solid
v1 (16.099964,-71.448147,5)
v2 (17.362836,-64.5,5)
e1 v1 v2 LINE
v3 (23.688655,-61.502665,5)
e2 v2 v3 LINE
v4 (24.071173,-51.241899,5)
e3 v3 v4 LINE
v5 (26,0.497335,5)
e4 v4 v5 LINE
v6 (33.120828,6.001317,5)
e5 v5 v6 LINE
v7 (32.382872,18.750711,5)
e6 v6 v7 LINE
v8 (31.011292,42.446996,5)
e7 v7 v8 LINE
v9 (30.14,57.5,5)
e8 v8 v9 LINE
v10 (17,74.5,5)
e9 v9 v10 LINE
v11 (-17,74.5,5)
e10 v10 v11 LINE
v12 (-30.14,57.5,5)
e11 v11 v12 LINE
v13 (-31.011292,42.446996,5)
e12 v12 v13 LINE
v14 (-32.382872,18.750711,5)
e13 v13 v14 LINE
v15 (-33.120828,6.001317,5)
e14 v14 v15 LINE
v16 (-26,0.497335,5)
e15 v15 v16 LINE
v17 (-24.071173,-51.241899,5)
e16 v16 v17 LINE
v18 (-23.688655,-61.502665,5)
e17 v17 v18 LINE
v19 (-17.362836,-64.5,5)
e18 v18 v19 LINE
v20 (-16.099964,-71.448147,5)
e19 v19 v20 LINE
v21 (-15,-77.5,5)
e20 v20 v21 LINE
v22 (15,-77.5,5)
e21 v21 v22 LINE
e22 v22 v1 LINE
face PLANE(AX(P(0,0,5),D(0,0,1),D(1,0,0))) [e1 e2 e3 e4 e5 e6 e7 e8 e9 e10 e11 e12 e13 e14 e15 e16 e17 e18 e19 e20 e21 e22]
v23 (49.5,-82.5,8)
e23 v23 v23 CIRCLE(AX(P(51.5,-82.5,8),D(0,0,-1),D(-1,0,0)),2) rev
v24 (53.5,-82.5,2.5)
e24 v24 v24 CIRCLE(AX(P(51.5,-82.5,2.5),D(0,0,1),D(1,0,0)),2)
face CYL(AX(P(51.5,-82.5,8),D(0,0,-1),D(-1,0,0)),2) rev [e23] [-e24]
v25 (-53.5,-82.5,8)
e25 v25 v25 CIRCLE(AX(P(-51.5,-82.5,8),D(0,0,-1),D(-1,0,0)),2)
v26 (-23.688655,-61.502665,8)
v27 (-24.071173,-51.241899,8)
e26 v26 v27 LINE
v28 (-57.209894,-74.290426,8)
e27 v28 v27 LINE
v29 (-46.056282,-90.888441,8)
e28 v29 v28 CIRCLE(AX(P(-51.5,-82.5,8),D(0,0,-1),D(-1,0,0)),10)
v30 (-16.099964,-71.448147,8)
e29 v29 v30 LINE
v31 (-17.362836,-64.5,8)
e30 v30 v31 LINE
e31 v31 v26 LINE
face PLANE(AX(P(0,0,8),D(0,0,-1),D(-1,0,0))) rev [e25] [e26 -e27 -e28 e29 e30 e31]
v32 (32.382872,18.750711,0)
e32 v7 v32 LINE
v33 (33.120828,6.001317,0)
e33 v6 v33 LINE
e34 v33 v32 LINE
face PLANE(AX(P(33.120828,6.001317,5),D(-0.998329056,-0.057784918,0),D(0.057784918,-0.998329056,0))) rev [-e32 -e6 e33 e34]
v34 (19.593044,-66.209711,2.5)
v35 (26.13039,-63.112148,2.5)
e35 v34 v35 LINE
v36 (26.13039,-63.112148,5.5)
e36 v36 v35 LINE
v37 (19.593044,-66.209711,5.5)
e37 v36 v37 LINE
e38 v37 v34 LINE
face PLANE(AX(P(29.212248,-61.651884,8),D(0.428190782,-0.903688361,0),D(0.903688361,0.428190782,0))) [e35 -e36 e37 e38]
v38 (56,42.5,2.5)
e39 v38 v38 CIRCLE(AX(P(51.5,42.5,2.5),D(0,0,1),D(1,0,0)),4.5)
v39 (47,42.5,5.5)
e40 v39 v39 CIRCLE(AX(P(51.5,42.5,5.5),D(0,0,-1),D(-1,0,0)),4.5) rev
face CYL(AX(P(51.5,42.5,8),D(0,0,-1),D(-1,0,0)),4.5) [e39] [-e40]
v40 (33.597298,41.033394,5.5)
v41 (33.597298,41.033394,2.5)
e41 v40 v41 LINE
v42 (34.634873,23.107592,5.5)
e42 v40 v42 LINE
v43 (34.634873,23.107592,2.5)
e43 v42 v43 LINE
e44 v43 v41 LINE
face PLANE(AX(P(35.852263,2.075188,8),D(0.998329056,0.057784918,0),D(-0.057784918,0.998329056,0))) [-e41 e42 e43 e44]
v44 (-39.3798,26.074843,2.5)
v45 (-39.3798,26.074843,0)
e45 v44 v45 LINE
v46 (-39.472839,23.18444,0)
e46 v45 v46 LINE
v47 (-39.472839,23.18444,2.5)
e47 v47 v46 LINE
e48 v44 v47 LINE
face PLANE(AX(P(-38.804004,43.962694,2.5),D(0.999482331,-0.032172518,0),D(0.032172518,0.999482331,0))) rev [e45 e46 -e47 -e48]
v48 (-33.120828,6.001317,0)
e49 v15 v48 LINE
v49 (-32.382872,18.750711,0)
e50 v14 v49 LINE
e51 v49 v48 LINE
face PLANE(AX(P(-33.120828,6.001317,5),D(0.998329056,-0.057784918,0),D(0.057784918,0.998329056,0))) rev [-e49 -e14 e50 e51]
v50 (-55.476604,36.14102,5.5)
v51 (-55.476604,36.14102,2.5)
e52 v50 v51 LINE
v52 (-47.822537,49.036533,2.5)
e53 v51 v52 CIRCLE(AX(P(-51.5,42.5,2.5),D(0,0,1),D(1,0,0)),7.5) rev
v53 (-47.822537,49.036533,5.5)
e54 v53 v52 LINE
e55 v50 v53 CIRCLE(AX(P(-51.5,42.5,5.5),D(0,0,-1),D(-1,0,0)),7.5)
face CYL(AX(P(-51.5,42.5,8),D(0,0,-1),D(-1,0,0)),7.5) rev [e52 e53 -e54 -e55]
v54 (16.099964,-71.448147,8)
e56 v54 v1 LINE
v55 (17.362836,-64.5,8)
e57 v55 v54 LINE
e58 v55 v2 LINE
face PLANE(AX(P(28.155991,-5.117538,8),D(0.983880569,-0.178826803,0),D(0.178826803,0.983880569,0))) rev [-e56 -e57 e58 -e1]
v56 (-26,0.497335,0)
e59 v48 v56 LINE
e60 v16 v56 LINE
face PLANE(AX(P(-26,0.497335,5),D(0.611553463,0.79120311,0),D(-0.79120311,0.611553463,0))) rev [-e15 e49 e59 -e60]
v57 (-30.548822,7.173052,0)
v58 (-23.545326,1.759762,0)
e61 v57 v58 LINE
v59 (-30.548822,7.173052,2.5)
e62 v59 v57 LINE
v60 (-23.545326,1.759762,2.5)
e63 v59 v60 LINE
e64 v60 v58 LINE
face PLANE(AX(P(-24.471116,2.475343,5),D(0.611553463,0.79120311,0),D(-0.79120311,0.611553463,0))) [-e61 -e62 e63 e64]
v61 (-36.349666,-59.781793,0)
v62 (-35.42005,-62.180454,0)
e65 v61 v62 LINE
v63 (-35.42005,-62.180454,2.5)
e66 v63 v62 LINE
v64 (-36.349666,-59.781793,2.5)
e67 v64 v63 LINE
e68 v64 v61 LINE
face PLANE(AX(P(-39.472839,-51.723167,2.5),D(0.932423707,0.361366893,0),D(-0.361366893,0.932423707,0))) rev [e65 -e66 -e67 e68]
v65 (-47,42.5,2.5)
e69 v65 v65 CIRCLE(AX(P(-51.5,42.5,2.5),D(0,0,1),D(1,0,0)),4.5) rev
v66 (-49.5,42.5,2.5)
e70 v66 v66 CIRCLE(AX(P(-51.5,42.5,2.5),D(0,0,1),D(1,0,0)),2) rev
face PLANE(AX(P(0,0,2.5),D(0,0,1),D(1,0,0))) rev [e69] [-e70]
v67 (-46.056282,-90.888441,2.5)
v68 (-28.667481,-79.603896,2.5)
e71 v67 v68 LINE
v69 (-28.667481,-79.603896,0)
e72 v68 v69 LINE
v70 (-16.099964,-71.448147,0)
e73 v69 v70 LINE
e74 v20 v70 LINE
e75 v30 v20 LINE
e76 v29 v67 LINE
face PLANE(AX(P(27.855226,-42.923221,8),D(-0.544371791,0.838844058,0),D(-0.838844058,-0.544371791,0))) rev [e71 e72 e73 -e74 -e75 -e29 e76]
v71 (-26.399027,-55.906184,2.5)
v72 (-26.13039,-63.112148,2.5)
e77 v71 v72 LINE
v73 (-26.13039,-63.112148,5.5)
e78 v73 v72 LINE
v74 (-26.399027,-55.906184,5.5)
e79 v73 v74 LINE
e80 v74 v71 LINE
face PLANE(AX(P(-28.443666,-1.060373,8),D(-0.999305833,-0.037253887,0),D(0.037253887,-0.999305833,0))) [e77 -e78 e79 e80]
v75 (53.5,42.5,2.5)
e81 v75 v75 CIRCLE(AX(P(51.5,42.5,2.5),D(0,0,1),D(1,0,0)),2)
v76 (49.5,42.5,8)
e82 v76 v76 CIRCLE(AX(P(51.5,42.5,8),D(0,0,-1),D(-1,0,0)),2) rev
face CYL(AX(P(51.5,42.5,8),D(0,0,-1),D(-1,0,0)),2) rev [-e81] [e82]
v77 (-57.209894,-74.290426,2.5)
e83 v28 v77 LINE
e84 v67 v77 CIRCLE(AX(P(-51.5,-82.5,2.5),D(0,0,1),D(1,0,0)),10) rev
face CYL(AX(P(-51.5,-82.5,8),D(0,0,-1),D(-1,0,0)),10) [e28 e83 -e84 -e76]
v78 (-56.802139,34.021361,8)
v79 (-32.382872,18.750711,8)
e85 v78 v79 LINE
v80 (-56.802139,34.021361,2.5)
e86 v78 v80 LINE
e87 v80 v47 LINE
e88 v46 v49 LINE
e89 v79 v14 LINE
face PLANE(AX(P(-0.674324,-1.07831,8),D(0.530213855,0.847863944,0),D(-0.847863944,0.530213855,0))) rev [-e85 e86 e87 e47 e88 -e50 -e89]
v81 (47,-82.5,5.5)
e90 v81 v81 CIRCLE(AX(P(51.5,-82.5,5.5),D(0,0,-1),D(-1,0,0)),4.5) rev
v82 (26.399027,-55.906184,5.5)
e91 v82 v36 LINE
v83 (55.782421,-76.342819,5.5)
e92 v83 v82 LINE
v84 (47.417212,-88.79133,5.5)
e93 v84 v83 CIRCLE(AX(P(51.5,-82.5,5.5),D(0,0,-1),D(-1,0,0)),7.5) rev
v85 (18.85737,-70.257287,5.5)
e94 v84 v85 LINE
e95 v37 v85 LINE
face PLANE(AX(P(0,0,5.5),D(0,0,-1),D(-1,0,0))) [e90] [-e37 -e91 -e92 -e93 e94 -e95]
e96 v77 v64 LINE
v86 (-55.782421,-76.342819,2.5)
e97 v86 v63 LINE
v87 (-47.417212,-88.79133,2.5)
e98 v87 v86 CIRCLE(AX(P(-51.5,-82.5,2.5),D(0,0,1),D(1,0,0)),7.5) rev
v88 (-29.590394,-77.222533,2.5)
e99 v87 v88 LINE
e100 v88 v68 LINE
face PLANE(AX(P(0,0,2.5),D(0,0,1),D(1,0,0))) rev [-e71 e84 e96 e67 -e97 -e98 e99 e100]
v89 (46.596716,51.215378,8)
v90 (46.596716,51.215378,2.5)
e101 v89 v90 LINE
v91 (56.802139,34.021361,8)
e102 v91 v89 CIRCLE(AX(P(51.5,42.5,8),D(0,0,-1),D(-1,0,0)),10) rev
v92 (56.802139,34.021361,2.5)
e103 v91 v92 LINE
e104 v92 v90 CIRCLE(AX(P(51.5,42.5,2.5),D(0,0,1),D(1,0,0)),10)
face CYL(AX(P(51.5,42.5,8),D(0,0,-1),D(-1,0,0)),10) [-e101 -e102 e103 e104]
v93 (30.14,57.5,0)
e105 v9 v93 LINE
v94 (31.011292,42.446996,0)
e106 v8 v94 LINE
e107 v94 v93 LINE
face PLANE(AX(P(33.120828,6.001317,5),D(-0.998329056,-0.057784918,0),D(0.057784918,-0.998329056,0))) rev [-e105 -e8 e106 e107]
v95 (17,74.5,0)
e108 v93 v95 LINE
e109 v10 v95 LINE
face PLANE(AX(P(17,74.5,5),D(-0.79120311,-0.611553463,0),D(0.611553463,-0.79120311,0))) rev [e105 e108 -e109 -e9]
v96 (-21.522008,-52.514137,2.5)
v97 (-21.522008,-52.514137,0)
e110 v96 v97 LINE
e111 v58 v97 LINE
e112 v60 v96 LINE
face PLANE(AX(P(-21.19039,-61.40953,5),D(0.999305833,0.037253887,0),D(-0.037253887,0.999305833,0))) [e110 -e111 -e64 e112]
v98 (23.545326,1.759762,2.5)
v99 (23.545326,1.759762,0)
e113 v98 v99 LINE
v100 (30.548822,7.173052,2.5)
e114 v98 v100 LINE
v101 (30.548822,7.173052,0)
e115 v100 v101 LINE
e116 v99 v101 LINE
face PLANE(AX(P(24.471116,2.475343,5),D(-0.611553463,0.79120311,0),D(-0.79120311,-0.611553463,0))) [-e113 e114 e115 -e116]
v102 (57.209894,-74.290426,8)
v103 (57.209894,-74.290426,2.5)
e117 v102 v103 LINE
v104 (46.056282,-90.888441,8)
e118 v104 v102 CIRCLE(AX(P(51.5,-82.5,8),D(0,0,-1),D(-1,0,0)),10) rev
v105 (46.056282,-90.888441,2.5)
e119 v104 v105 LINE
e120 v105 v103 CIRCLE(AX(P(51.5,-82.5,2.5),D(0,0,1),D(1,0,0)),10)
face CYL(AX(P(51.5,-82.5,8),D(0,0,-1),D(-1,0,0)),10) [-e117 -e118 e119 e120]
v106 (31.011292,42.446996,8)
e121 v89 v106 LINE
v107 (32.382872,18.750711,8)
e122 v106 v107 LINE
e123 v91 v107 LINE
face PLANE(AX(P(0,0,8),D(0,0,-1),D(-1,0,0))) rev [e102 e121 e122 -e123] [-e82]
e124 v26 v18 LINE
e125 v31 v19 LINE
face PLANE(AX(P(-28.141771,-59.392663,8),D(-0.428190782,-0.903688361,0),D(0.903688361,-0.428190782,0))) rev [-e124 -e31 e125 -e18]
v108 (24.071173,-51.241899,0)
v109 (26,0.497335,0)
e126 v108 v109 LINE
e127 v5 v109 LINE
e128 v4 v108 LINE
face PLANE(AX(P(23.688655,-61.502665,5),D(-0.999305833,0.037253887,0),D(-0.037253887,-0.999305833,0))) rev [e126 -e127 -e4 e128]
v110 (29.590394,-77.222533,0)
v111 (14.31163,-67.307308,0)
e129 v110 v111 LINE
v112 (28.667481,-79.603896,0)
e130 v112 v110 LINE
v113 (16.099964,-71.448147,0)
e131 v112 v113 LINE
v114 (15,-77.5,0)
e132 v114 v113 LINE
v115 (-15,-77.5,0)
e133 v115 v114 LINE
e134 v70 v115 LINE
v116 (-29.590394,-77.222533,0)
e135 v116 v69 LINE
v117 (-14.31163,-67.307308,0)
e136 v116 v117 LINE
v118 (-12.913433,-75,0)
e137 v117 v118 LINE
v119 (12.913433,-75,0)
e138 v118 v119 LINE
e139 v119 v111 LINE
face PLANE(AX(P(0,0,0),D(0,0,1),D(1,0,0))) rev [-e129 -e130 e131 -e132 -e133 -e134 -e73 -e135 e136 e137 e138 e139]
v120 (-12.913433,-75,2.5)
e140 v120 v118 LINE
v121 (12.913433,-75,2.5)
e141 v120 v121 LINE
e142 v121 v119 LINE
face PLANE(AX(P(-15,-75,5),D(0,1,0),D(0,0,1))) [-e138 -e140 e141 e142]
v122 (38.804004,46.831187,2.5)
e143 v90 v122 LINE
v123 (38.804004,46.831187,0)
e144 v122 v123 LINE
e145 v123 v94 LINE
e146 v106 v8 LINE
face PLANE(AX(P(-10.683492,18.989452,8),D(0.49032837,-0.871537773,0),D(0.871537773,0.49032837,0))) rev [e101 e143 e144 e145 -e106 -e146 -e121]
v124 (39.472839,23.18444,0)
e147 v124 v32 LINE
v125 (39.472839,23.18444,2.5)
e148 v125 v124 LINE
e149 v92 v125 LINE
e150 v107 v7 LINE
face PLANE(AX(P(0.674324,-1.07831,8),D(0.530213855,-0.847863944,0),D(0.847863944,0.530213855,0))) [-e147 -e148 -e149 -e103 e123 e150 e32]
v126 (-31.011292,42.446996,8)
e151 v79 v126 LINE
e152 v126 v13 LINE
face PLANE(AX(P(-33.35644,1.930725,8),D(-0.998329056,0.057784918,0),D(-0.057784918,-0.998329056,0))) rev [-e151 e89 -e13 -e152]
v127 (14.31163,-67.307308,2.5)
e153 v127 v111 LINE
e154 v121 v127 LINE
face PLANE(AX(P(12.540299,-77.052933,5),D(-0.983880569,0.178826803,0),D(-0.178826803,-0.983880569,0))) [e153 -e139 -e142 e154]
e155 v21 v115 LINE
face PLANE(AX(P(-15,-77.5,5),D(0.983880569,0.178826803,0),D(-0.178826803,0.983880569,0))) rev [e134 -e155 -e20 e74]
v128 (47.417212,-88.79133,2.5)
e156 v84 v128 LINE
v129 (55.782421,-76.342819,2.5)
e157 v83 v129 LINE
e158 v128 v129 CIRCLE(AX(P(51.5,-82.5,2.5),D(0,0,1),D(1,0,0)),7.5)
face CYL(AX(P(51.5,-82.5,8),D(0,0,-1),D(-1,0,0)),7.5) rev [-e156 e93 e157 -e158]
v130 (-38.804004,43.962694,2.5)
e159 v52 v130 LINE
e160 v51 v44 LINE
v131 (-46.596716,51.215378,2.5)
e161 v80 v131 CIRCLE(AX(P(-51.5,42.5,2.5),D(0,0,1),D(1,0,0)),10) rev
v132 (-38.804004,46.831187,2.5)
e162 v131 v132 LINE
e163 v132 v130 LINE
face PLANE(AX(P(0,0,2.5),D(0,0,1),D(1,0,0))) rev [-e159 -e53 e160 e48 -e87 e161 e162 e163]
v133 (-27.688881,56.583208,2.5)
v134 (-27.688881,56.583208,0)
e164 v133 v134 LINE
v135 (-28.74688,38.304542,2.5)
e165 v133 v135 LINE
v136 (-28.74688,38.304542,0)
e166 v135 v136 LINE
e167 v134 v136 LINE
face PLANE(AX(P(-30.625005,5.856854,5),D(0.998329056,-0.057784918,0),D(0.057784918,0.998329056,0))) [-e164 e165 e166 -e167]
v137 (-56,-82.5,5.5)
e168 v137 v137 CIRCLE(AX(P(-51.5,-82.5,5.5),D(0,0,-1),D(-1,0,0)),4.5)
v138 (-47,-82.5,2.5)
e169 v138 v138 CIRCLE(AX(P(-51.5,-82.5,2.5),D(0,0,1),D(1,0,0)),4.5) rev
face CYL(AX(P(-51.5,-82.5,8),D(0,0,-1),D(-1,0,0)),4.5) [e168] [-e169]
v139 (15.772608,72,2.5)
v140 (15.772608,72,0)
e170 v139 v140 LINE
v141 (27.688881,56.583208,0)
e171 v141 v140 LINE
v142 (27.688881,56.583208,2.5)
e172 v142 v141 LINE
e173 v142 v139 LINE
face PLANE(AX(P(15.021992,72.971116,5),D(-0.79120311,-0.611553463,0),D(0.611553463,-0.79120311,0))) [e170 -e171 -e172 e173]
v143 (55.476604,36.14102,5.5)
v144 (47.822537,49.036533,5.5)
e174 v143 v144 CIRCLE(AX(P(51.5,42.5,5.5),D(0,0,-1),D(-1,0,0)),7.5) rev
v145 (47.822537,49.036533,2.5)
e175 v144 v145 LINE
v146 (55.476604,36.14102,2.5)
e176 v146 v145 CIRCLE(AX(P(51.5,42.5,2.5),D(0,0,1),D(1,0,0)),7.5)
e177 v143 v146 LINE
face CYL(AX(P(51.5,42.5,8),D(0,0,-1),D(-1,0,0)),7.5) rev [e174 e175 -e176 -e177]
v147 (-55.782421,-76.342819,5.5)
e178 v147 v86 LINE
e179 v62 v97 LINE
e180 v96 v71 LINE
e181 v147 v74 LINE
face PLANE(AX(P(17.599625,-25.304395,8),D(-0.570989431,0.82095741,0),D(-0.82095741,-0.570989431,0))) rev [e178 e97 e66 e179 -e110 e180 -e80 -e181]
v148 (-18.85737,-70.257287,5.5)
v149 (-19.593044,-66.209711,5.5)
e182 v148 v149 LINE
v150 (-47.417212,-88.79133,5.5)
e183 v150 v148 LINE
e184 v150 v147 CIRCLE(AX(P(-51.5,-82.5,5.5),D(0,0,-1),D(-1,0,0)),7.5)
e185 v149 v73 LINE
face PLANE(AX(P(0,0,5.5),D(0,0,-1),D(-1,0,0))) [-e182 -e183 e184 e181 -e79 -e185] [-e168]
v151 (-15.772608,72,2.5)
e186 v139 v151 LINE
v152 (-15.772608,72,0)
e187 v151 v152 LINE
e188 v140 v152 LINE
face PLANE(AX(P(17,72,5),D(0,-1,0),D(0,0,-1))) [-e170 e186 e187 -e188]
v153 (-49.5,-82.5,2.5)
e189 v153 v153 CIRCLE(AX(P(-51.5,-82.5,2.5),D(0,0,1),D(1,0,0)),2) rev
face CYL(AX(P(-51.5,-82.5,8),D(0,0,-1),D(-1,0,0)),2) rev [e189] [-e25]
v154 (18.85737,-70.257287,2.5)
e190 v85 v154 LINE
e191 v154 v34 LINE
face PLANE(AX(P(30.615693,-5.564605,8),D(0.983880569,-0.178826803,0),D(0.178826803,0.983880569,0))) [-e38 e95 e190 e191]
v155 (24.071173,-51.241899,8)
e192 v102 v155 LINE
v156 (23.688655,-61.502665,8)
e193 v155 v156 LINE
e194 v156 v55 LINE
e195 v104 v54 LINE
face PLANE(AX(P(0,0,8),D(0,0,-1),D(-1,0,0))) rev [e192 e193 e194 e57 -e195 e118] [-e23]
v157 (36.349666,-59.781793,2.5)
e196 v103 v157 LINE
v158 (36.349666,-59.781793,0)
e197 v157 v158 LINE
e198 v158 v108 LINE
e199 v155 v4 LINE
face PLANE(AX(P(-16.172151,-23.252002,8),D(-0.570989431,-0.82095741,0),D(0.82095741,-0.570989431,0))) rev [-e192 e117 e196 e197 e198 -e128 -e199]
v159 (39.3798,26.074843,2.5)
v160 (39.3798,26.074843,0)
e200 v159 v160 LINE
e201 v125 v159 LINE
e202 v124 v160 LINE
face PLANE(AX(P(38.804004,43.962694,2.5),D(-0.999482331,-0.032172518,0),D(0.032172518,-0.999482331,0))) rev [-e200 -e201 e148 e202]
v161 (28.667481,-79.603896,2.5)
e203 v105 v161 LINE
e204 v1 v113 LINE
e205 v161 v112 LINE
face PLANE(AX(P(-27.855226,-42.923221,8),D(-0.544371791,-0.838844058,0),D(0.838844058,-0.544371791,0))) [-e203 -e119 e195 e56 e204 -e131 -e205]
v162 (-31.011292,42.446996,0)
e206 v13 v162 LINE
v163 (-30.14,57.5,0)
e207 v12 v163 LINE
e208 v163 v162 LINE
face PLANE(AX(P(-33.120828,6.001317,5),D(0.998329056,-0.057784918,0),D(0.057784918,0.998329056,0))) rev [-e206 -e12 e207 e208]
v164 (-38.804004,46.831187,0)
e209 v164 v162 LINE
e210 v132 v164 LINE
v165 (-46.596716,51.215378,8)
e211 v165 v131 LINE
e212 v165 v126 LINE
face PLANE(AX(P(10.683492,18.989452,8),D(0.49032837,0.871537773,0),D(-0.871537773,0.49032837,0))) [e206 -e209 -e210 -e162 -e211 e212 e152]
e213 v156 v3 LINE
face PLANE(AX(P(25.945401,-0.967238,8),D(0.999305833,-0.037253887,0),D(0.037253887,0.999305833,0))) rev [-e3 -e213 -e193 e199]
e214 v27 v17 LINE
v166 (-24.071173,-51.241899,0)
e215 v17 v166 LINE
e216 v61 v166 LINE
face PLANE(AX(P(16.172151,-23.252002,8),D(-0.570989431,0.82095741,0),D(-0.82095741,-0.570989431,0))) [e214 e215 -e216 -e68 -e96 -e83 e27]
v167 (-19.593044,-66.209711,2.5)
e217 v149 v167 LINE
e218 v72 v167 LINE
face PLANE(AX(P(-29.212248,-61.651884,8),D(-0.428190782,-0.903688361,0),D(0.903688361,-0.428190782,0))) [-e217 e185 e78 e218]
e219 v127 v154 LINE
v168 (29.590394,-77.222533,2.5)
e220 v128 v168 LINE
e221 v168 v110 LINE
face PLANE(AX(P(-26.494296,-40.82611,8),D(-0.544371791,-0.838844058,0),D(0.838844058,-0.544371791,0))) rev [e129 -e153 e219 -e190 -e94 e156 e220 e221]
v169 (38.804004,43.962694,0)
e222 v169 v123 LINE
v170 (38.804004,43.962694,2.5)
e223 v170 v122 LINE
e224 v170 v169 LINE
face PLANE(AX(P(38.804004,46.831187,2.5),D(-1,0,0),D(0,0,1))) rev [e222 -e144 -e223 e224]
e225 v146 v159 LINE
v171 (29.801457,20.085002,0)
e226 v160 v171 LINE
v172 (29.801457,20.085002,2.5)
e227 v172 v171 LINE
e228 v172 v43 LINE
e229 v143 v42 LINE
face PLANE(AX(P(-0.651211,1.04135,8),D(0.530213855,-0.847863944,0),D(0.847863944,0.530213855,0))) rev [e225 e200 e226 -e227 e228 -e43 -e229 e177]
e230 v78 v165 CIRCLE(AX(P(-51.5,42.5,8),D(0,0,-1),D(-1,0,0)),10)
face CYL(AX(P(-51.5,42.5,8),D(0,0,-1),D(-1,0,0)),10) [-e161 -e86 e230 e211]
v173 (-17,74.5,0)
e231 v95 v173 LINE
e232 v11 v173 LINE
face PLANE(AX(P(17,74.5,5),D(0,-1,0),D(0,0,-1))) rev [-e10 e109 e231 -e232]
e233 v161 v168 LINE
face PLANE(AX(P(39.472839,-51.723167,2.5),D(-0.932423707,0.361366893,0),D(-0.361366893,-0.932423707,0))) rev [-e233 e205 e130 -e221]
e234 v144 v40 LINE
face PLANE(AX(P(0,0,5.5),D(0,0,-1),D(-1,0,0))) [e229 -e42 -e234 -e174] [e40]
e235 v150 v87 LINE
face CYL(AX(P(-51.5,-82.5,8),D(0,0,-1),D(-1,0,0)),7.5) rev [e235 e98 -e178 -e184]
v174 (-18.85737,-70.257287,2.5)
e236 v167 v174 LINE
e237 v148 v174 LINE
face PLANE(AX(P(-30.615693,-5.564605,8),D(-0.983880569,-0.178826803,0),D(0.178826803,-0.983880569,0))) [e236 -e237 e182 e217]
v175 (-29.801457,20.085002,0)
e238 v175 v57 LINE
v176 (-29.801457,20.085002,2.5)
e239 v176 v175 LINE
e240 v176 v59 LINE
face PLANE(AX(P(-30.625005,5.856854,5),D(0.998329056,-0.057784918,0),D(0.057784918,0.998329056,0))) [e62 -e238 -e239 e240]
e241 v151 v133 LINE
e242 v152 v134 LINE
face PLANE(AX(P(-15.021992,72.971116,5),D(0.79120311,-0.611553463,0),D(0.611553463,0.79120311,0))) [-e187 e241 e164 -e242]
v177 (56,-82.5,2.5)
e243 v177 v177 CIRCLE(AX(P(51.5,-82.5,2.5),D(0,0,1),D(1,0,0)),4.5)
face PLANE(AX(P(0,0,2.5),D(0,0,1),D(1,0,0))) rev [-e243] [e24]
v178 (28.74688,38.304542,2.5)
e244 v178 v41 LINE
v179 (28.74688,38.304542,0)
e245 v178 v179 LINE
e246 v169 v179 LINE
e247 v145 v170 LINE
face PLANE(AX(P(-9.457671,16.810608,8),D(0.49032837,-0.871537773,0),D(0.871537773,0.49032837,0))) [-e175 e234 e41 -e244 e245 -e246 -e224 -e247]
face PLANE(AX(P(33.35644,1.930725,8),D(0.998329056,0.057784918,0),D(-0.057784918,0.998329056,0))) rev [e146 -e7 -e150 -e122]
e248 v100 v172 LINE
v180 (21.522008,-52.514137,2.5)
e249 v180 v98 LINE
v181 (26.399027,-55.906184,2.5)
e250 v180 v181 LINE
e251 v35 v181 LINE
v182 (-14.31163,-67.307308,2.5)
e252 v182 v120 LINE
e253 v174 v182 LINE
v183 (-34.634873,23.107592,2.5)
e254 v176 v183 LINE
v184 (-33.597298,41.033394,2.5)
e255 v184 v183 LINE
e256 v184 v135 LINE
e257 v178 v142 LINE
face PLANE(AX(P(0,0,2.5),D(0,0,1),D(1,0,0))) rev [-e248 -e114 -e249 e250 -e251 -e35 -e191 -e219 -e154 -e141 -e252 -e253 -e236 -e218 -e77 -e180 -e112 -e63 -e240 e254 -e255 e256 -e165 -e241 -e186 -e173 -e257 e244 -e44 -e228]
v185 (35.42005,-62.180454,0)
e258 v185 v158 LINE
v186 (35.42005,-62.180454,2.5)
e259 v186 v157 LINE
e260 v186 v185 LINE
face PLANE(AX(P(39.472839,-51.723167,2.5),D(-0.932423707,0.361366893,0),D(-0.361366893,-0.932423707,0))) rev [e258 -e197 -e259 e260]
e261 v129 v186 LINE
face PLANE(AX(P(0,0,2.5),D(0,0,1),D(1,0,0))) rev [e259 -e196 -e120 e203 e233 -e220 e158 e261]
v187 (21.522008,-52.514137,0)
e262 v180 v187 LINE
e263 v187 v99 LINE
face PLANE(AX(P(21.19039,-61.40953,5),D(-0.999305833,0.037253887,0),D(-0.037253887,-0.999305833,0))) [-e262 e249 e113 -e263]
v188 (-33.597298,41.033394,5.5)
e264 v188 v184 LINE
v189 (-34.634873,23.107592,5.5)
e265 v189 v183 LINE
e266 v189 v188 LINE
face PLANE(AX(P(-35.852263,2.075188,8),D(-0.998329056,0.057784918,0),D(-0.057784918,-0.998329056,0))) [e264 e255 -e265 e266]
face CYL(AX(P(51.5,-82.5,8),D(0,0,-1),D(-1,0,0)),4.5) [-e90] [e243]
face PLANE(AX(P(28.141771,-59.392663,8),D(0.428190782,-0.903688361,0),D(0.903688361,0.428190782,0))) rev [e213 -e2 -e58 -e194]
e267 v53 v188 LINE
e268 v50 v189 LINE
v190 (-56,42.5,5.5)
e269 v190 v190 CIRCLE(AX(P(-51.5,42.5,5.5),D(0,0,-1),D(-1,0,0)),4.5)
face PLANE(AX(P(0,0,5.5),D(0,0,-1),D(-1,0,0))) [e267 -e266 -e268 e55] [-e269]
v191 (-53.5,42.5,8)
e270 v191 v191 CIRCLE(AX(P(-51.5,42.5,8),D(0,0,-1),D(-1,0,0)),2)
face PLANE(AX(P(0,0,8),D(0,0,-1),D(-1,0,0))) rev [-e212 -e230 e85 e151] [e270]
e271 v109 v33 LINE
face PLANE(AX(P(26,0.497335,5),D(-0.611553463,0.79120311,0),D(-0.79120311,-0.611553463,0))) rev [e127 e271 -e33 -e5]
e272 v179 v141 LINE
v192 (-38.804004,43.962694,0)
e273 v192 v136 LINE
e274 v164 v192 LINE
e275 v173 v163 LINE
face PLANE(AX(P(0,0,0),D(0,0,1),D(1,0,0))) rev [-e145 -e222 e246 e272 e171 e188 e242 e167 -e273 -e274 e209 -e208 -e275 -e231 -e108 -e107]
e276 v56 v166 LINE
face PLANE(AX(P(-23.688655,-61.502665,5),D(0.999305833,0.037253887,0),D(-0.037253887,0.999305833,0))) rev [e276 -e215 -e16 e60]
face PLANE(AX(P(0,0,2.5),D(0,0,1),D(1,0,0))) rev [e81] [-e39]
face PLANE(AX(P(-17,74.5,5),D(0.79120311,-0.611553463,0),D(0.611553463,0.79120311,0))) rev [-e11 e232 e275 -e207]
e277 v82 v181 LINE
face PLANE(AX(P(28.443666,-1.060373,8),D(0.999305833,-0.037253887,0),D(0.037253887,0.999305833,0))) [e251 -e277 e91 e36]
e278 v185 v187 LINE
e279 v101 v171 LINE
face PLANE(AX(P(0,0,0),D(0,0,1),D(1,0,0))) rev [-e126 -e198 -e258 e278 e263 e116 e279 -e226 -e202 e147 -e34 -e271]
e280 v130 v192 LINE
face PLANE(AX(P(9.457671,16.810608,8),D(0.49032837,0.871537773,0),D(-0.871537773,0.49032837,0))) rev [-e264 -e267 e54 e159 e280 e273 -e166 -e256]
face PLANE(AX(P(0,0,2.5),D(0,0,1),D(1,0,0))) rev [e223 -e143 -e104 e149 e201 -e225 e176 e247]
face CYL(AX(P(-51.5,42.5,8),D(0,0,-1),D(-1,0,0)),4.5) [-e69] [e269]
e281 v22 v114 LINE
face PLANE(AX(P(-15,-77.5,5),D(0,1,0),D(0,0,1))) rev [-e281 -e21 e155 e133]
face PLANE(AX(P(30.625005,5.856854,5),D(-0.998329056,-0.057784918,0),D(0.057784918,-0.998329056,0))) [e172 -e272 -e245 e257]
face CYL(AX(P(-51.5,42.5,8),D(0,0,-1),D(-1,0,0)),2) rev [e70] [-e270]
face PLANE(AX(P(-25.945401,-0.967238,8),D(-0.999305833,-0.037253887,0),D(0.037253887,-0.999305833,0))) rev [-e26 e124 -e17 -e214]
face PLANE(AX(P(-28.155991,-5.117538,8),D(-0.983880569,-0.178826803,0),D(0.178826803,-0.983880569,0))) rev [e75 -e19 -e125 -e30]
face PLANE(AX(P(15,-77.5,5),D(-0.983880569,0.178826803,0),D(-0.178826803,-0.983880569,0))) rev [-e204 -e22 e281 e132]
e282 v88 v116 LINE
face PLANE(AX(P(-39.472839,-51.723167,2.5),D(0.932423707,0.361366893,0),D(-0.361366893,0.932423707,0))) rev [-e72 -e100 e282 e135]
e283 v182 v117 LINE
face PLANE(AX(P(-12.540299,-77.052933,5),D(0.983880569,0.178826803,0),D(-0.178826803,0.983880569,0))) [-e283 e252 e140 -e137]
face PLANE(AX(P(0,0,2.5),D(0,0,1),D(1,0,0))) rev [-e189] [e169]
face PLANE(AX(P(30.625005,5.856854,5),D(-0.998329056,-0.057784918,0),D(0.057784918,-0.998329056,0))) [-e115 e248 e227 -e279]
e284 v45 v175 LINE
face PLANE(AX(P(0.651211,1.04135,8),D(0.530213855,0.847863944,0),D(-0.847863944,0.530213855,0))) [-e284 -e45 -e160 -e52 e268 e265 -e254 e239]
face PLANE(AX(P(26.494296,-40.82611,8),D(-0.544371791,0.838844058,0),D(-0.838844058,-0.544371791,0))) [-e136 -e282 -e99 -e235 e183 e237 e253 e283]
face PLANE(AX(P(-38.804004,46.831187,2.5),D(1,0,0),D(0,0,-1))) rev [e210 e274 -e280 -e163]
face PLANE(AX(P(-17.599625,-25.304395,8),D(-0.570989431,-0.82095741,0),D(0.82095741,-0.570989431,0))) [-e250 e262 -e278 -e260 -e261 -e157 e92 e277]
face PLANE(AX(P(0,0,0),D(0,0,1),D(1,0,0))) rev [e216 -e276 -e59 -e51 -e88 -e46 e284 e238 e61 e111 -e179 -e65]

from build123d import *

# Parameters (mm, degrees)
EXTRUDE_1_DEPTH     = 5
SKETCH_2_R          = 10
SKETCH_2_R_2        = 2
EXTRUDE_2_DEPTH     = 8
SHELL_1_OUTLINE_R   = 4.5
SHELL_1_DEPTH       = 2.5
SHELL_START         = 2.5
SHELL_1_2_OUTLINE_R = 4.5
SHELL_1_2_DEPTH     = 3
CUT_EXTRUDE_6_DEPTH = 2.5


with BuildPart() as part:
    # ｽｹｯﾁ1 → ﾎﾞｽ - 押し出し1 (new body)
    with BuildSketch(Plane.XY):
        Polygon((-15, -77.5), (15, -77.5), (17.362836016, -64.5), (23.688654544, -61.502664525), (26, 0.497335475), (33.120827994, 6.001316642), (30.14, 57.5), (17, 74.5), (-17, 74.5), (-30.14, 57.5), (-33.120827994, 6.001316642), (-26, 0.497335475), (-23.688654544, -61.502664525), (-17.362836016, -64.5), align=None)
    extrude(amount=EXTRUDE_1_DEPTH)

    # ｽｹｯﾁ2 → ﾎﾞｽ - 押し出し2 (add)
    # profile 1 of 8: a face of its own
    with BuildSketch(Plane(origin=(0, 0, 0), x_dir=(-1, 0, 0), z_dir=(0, 0, -1))):
        with BuildLine():
            Line((-32.382872215, 18.750710787), (-31.011292455, 42.446996487))
            Line((-31.011292455, 42.446996487), (-46.596716305, 51.215377732))
            ThreePointArc((-46.596716305, 51.215377732), (-42.867710705, 47.548126536), (-41.5, 42.5))
            ThreePointArc((-41.5, 42.5), (-46.653423142, 33.752960915), (-56.802138552, 34.021360559))
            Line((-56.802138552, 34.021360559), (-32.382872215, 18.750710787))
        make_face()
    # profile 2 of 8: a face of its own
    with BuildSketch(Plane(origin=(0, 0, 0), x_dir=(-1, 0, 0), z_dir=(0, 0, -1))):
        with Locations((-51.5, 42.5)):
            Circle(SKETCH_2_R)
        with Locations((-51.5, 42.5)):
            Circle(SKETCH_2_R_2, mode=Mode.SUBTRACT)
    # profile 3 of 8: a face of its own
    with BuildSketch(Plane(origin=(0, 0, 0), x_dir=(-1, 0, 0), z_dir=(0, 0, -1))):
        with Locations((51.5, 42.5)):
            Circle(SKETCH_2_R)
        with Locations((51.5, 42.5)):
            Circle(SKETCH_2_R_2, mode=Mode.SUBTRACT)
    # profile 4 of 8: a face of its own
    with BuildSketch(Plane(origin=(0, 0, 0), x_dir=(-1, 0, 0), z_dir=(0, 0, -1))):
        with Locations((51.5, -82.5)):
            Circle(SKETCH_2_R)
        with Locations((51.5, -82.5)):
            Circle(SKETCH_2_R_2, mode=Mode.SUBTRACT)
    # profile 5 of 8: a face of its own
    with BuildSketch(Plane(origin=(0, 0, 0), x_dir=(-1, 0, 0), z_dir=(0, 0, -1))):
        with BuildLine():
            Line((16.09996425, -71.448147417), (46.056282089, -90.888440577))
            ThreePointArc((46.056282089, -90.888440577), (43.199925585, -76.922476831), (57.20989431, -74.290425896))
            Line((57.20989431, -74.290425896), (24.071173493, -51.241898524))
            Line((24.071173493, -51.241898524), (23.688654544, -61.502664525))
            Line((23.688654544, -61.502664525), (17.362836016, -64.5))
            Line((17.362836016, -64.5), (16.09996425, -71.448147417))
        make_face()
    # profile 6 of 8: a face of its own
    with BuildSketch(Plane(origin=(0, 0, 0), x_dir=(-1, 0, 0), z_dir=(0, 0, -1))):
        with BuildLine():
            ThreePointArc((56.802138552, 34.021360559), (42.900678635, 37.395916139), (46.596716305, 51.215377732))
            Line((46.596716305, 51.215377732), (31.011292455, 42.446996487))
            Line((31.011292455, 42.446996487), (32.382872215, 18.750710787))
            Line((32.382872215, 18.750710787), (56.802138552, 34.021360559))
        make_face()
    # profile 7 of 8: a face of its own
    with BuildSketch(Plane(origin=(0, 0, 0), x_dir=(-1, 0, 0), z_dir=(0, 0, -1))):
        with BuildLine():
            Line((-46.056282089, -90.888440577), (-16.09996425, -71.448147417))
            Line((-16.09996425, -71.448147417), (-17.362836016, -64.5))
            Line((-17.362836016, -64.5), (-23.688654544, -61.502664525))
            Line((-23.688654544, -61.502664525), (-24.071173493, -51.241898524))
            Line((-24.071173493, -51.241898524), (-57.20989431, -74.290425896))
            ThreePointArc((-57.20989431, -74.290425896), (-46.868528479, -73.637186025), (-41.5, -82.5))
            ThreePointArc((-41.5, -82.5), (-42.712589144, -87.272987581), (-46.056282089, -90.888440577))
        make_face()
    # profile 8 of 8: a face of its own
    with BuildSketch(Plane(origin=(0, 0, 0), x_dir=(-1, 0, 0), z_dir=(0, 0, -1))):
        with Locations((-51.5, -82.5)):
            Circle(SKETCH_2_R)
        with Locations((-51.5, -82.5)):
            Circle(SKETCH_2_R_2, mode=Mode.SUBTRACT)
    extrude(amount=-EXTRUDE_2_DEPTH)

    # ｼｪﾙ1: read off the stored shape, not the designer's step
    # ｼｪﾙ1 outline → ｼｪﾙ1 (cut)
    with BuildSketch(Plane.XY):
        with BuildLine():
            Line((21.522008123, -52.514136891), (23.545326343, 1.75976204))
            Line((23.545326343, 1.75976204), (30.548821684, 7.173051968))
            Line((30.548821684, 7.173051968), (29.801456877, 20.085002485))
            Line((29.801456877, 20.085002485), (55.476603914, 36.141020419))
            ThreePointArc((55.476603914, 36.141020419), (57.949491024, 46.328062896), (47.822537229, 49.036533299))
            Line((47.822537229, 49.036533299), (28.746880144, 38.304541956))
            Line((28.746880144, 38.304541956), (27.688881042, 56.583208435))
            Line((27.688881042, 56.583208435), (15.772608032, 72))
            Line((15.772608032, 72), (-15.772608032, 72))
            Line((-15.772608032, 72), (-27.688881042, 56.583208435))
            Line((-27.688881042, 56.583208435), (-28.746880144, 38.304541956))
            Line((-28.746880144, 38.304541956), (-47.822537229, 49.036533299))
            ThreePointArc((-47.822537229, 49.036533299), (-57.949491024, 46.328062896), (-55.476603914, 36.141020419))
            Line((-55.476603914, 36.141020419), (-29.801456877, 20.085002485))
            Line((-29.801456877, 20.085002485), (-30.548821684, 7.173051968))
            Line((-30.548821684, 7.173051968), (-23.545326343, 1.75976204))
            Line((-23.545326343, 1.75976204), (-21.522008123, -52.514136891))
            Line((-21.522008123, -52.514136891), (-55.782420733, -76.342819422))
            ThreePointArc((-55.782420733, -76.342819422), (-57.725055812, -86.683142377), (-47.417211567, -88.791330433))
            Line((-47.417211567, -88.791330433), (-14.311630395, -67.307308042))
            Line((-14.311630395, -67.307308042), (-12.913432732, -75))
            Line((-12.913432732, -75), (12.913432732, -75))
            Line((12.913432732, -75), (14.311630395, -67.307308042))
            Line((14.311630395, -67.307308042), (47.417211567, -88.791330433))
            ThreePointArc((47.417211567, -88.791330433), (57.725055812, -86.683142377), (55.782420733, -76.342819422))
            Line((55.782420733, -76.342819422), (21.522008123, -52.514136891))
        make_face()
        with Locations((51.5, -82.5)):
            Circle(SHELL_1_OUTLINE_R, mode=Mode.SUBTRACT)
        with Locations((-51.5, -82.5)):
            Circle(SHELL_1_OUTLINE_R, mode=Mode.SUBTRACT)
        with Locations((-51.5, 42.5)):
            Circle(SHELL_1_OUTLINE_R, mode=Mode.SUBTRACT)
        with Locations((51.5, 42.5)):
            Circle(SHELL_1_OUTLINE_R, mode=Mode.SUBTRACT)
    extrude(amount=SHELL_1_DEPTH, mode=Mode.SUBTRACT)

    # Shell 1 2 outline → Shell 1 2 (cut)
    # profile 1 of 4: a face of its own
    with BuildSketch(Plane.XY.offset(SHELL_START)):
        with BuildLine():
            Line((55.782420733, -76.342819422), (26.399026656, -55.906183789))
            Line((26.399026656, -55.906183789), (26.130390005, -63.112147889))
            Line((26.130390005, -63.112147889), (19.593043591, -66.209710715))
            Line((19.593043591, -66.209710715), (18.857369821, -70.257286993))
            Line((18.857369821, -70.257286993), (47.417211567, -88.791330433))
            ThreePointArc((47.417211567, -88.791330433), (57.725055812, -86.683142377), (55.782420733, -76.342819422))
        make_face()
        with Locations((51.5, -82.5)):
            Circle(SHELL_1_2_OUTLINE_R, mode=Mode.SUBTRACT)
    # profile 2 of 4: a face of its own
    with BuildSketch(Plane.XY.offset(SHELL_START)):
        with BuildLine():
            Line((33.597298428, 41.033394063), (34.634873185, 23.10759156))
            Line((34.634873185, 23.10759156), (55.476603914, 36.141020419))
            ThreePointArc((55.476603914, 36.141020419), (57.949491024, 46.328062896), (47.822537229, 49.036533299))
            Line((47.822537229, 49.036533299), (33.597298428, 41.033394063))
        make_face()
        with Locations((51.5, 42.5)):
            Circle(SHELL_1_2_OUTLINE_R, mode=Mode.SUBTRACT)
    # profile 3 of 4: a face of its own
    with BuildSketch(Plane.XY.offset(SHELL_START)):
        with BuildLine():
            Line((-47.417211567, -88.791330433), (-18.857369821, -70.257286993))
            Line((-18.857369821, -70.257286993), (-19.593043591, -66.209710715))
            Line((-19.593043591, -66.209710715), (-26.130390005, -63.112147889))
            Line((-26.130390005, -63.112147889), (-26.399026656, -55.90618379))
            Line((-26.399026656, -55.90618379), (-55.782420733, -76.342819422))
            ThreePointArc((-55.782420733, -76.342819422), (-57.725055812, -86.683142377), (-47.417211567, -88.791330433))
        make_face()
        with Locations((-51.5, -82.5)):
            Circle(SHELL_1_2_OUTLINE_R, mode=Mode.SUBTRACT)
    # profile 4 of 4: a face of its own
    with BuildSketch(Plane.XY.offset(SHELL_START)):
        with BuildLine():
            Line((-34.634873185, 23.10759156), (-33.597298428, 41.033394063))
            Line((-33.597298428, 41.033394063), (-47.822537229, 49.036533299))
            ThreePointArc((-47.822537229, 49.036533299), (-57.949491024, 46.328062896), (-55.476603914, 36.141020419))
            Line((-55.476603914, 36.141020419), (-34.634873185, 23.10759156))
        make_face()
        with Locations((-51.5, 42.5)):
            Circle(SHELL_1_2_OUTLINE_R, mode=Mode.SUBTRACT)
    extrude(amount=SHELL_1_2_DEPTH, mode=Mode.SUBTRACT)

    # ｽｹｯﾁ5 → ｶｯﾄ - 押し出し6 (cut)
    with BuildSketch(Plane(origin=(0, 0, 0), x_dir=(-1, 0, 0), z_dir=(0, 0, -1))):
        Polygon((-38.80400438, 46.831187109), (-38.80400438, 43.962694111), (-39.472839378, 23.184439628), (-51.319731768, 2.127093459), (-84.265468017, 28.099065241), (-81.185505749, 33.573566869), (-64.091586556, 65.569805047), (-41.966326194, 51.733717696), align=None)
        Polygon((-39.472839378, -51.723167443), (-24.731165472, -89.760648138), (-36.427967097, -116.261009638), (-70.745334213, -107.593739558), (-74.01113331, -73.736521524), align=None)
        Polygon((70.745334213, -107.593739558), (74.01113331, -73.736521524), (39.472839378, -51.723167443), (24.731165472, -89.760648138), (36.427967097, -116.261009638), align=None)
        Polygon((64.091586556, 65.569805047), (41.966326194, 51.733717696), (38.80400438, 46.831187109), (38.80400438, 43.962694111), (39.472839378, 23.184439628), (51.319731768, 2.127093459), (84.265468017, 28.099065241), (81.185505749, 33.573566869), align=None)
    extrude(amount=-CUT_EXTRUDE_6_DEPTH, mode=Mode.SUBTRACT)


solid = part.part
